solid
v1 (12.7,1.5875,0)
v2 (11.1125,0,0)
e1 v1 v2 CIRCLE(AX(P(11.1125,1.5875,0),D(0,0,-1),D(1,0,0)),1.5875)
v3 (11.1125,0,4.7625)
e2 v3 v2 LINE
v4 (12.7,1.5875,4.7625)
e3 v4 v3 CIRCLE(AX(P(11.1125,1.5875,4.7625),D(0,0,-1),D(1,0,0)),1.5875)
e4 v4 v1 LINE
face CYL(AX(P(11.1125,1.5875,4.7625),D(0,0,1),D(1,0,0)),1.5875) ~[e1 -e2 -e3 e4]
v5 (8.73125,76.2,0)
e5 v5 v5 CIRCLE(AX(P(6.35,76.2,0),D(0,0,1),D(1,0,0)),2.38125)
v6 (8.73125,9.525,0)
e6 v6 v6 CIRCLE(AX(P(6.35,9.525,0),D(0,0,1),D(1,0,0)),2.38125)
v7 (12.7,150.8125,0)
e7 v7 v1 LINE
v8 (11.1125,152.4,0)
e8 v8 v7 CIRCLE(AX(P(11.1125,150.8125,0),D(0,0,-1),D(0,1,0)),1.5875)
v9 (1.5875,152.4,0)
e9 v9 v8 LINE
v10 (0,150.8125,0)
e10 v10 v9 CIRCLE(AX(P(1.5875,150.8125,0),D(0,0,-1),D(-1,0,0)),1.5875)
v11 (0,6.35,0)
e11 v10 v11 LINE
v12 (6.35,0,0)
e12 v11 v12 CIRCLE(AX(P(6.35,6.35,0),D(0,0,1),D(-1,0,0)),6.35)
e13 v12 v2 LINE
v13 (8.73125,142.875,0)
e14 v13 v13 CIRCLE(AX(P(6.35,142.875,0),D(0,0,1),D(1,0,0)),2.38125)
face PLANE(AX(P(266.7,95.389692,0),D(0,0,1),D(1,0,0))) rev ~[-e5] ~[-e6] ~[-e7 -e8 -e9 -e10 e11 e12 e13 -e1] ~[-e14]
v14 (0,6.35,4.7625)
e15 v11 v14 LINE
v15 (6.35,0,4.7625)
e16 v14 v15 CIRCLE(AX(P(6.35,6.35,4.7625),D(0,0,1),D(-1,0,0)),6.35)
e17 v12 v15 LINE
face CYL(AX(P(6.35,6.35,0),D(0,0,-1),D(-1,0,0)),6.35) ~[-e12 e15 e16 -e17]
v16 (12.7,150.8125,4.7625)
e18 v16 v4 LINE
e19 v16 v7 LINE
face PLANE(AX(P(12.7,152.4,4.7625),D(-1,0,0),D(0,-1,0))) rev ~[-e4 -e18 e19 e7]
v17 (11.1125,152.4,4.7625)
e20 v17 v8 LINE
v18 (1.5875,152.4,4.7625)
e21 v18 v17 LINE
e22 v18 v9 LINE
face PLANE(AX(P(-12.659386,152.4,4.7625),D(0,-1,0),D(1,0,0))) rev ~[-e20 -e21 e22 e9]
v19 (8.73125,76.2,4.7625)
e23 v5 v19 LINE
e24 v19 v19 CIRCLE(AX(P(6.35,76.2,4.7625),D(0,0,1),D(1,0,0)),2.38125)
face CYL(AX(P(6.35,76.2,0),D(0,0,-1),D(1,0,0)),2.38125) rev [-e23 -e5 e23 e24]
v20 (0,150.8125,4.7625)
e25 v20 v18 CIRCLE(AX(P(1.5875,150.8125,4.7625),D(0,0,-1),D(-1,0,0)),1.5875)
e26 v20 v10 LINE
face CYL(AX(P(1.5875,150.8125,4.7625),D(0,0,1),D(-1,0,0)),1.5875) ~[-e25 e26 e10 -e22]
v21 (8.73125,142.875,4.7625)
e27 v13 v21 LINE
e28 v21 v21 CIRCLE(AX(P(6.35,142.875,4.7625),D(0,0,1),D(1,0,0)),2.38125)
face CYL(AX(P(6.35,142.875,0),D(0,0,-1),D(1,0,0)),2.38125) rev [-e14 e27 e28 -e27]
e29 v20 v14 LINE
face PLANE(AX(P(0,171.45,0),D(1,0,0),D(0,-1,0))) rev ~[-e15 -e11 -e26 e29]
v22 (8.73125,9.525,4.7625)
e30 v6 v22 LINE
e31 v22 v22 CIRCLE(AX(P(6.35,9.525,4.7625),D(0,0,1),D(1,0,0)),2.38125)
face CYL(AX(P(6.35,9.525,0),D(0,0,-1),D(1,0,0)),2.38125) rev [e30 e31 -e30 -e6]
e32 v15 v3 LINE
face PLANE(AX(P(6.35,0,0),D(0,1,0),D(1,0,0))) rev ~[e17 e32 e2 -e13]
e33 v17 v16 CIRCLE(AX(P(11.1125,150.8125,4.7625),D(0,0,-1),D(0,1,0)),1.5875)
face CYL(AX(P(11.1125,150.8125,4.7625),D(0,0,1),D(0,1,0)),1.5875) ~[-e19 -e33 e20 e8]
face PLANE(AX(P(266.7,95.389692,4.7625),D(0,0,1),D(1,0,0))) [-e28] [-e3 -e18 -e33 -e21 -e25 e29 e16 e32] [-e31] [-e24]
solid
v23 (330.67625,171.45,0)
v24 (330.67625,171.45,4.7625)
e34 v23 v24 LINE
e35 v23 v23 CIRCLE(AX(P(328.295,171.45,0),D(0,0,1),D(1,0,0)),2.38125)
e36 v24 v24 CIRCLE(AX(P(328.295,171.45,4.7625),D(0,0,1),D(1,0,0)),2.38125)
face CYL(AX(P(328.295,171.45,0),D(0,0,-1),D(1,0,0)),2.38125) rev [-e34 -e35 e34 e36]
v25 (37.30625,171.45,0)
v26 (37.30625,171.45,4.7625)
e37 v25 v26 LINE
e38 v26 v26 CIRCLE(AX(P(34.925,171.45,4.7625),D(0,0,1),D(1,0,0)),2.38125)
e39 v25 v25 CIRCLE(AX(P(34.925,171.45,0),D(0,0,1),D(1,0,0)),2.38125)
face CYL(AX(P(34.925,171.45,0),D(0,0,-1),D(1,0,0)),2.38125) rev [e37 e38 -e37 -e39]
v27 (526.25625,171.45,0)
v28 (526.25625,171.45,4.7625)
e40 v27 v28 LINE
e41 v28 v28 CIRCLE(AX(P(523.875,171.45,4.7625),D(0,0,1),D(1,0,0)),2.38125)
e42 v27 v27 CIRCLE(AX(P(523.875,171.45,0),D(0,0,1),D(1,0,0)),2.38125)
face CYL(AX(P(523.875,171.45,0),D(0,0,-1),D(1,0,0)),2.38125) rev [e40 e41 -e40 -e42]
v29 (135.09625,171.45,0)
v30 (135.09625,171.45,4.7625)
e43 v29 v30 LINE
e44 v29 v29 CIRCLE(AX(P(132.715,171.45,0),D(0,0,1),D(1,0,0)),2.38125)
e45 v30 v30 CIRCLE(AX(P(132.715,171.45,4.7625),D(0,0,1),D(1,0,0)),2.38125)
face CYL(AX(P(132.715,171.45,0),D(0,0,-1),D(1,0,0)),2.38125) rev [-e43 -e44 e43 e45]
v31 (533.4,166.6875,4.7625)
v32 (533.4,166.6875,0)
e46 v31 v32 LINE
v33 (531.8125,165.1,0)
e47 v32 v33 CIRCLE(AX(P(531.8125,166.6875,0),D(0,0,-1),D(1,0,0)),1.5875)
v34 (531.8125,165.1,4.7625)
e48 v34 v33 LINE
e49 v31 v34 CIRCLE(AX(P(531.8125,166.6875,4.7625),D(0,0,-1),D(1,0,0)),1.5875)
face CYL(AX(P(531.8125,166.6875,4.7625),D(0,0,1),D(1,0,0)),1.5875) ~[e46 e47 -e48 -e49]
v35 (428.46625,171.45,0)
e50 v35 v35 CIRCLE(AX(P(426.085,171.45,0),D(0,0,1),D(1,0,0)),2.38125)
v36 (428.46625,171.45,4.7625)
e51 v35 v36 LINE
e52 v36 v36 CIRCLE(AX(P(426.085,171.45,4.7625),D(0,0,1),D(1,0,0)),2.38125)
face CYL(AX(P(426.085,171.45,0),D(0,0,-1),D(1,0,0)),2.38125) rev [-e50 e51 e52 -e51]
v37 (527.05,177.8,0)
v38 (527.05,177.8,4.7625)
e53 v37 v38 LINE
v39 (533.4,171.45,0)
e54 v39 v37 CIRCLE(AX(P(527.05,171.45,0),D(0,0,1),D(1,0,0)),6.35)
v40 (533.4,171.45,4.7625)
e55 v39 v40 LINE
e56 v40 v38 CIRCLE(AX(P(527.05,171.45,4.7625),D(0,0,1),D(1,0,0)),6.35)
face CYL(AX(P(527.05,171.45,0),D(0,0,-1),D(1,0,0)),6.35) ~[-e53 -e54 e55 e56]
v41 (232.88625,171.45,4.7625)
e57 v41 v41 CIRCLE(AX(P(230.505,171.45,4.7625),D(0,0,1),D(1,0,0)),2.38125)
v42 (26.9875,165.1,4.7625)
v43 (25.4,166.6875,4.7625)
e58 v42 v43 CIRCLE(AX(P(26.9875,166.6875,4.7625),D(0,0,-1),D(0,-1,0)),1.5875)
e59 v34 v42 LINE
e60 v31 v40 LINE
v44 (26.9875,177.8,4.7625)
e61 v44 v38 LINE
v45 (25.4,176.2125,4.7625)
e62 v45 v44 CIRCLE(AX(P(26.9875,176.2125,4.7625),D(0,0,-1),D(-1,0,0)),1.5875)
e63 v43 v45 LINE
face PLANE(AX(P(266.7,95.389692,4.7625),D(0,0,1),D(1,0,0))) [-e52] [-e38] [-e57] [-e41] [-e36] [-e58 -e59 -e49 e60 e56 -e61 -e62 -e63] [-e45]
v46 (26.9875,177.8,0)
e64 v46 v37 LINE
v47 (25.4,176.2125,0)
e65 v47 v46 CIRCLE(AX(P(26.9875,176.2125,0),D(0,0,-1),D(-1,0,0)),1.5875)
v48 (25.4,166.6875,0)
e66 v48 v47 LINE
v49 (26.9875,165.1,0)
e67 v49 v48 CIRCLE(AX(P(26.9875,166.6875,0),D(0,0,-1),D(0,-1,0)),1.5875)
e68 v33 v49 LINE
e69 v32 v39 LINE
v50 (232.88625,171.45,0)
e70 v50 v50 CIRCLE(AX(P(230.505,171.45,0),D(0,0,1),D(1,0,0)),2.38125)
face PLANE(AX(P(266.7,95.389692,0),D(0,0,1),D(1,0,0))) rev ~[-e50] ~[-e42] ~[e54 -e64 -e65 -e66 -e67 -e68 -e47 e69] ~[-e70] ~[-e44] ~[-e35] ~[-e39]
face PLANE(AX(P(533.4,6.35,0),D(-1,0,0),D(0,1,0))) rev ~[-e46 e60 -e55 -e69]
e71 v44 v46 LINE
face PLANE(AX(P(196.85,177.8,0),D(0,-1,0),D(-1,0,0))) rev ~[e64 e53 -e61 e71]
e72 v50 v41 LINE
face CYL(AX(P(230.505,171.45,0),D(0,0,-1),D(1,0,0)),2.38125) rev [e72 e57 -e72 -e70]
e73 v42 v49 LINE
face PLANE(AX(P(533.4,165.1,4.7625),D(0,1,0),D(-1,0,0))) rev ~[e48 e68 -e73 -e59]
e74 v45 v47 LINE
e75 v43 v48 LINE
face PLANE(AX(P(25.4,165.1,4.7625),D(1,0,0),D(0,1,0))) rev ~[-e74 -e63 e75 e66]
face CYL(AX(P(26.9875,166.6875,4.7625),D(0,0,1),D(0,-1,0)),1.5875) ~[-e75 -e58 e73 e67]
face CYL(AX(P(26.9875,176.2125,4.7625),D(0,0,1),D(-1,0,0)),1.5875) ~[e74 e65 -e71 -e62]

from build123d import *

# Parameters (mm, degrees)
F0_R     = 2.38125
F1_DEPTH = 4.7625
F4_W     = 148.8558202982
F4_H     = 38.4750810385
F4_W_2   = 12.7
F4_H_2   = 12.7
F5_DEPTH = 4.7635
F7_DEPTH = 4.7625


# Not quite as in the source:
# - a feature of the source that left no trace in its solid (it failed there, or was rolled back) is left out


with BuildPart() as f1:
    # F0 (on Top) → F1 (new body)
    with BuildSketch(Plane.XY):
        with BuildLine():
            ThreePointArc((0, 6.35), (1.8598719395, 1.8598719395), (6.35, 0))
            Line((6.35, 0), (527.05, 0))
            ThreePointArc((527.05, 0), (531.5401280605, 1.8598719395), (533.4, 6.35))
            Line((533.4, 6.35), (533.4, 171.45))
            ThreePointArc((533.4, 171.45), (531.5401280605, 175.9401280605), (527.05, 177.8))
            Line((527.05, 177.8), (336.55, 177.8))
            ThreePointArc((336.55, 177.8), (332.0598719395, 179.6598719395), (330.2, 184.15))
            Line((330.2, 184.15), (330.2, 203.2))
            ThreePointArc((330.2, 203.2), (328.3401280605, 207.6901280605), (323.85, 209.55))
            Line((323.85, 209.55), (209.55, 209.55))
            ThreePointArc((209.55, 209.55), (205.0598719395, 207.6901280605), (203.2, 203.2))
            Line((203.2, 203.2), (203.2, 184.15))
            ThreePointArc((203.2, 184.15), (201.3401280605, 179.6598719395), (196.85, 177.8))
            Line((196.85, 177.8), (6.35, 177.8))
            ThreePointArc((6.35, 177.8), (1.8598719395, 175.9401280605), (0, 171.45))
            Line((0, 171.45), (0, 6.35))
        make_face()
        with Locations((6.35, 9.525)):
            Circle(F0_R, mode=Mode.SUBTRACT)
        with Locations((257.175, 30.1625)):
            Circle(F0_R, mode=Mode.SUBTRACT)
        with Locations((6.35, 76.2)):
            Circle(F0_R, mode=Mode.SUBTRACT)
        with Locations((257.175, 93.6625)):
            Circle(F0_R, mode=Mode.SUBTRACT)
        with Locations((485.775, 30.1625)):
            Circle(F0_R, mode=Mode.SUBTRACT)
        with Locations((485.775, 93.6625)):
            Circle(F0_R, mode=Mode.SUBTRACT)
        with Locations((6.35, 142.875)):
            Circle(F0_R, mode=Mode.SUBTRACT)
        with Locations((34.925, 171.45)):
            Circle(F0_R, mode=Mode.SUBTRACT)
        with Locations((132.715, 171.45)):
            Circle(F0_R, mode=Mode.SUBTRACT)
        with Locations((230.505, 171.45)):
            Circle(F0_R, mode=Mode.SUBTRACT)
        with Locations((223.8375, 195.2625)):
            Circle(F0_R, mode=Mode.SUBTRACT)
        with Locations((239.7125, 185.7375)):
            Circle(F0_R, mode=Mode.SUBTRACT)
        with Locations((328.295, 171.45)):
            Circle(F0_R, mode=Mode.SUBTRACT)
        with Locations((293.6875, 185.7375)):
            Circle(F0_R, mode=Mode.SUBTRACT)
        with Locations((309.5625, 195.2625)):
            Circle(F0_R, mode=Mode.SUBTRACT)
        with Locations((426.085, 171.45)):
            Circle(F0_R, mode=Mode.SUBTRACT)
        with Locations((523.875, 171.45)):
            Circle(F0_R, mode=Mode.SUBTRACT)
    extrude(amount=F1_DEPTH)

    # F4 (on face) → F5 (cut, through all)
    with BuildSketch(Plane.XY.offset(4.7625)):
        with Locations((269.9074968696, 197.0375405192)):
            Rectangle(F4_W, F4_H)
        Polygon((25.4, 185.5913083792), (-12.6593864247, 185.5913083792), (-12.6593864247, 152.4), (12.7, 152.4), (12.7, 165.1), (25.4, 165.1), align=None)
        Polygon((533.4, 165.1), (25.4, 165.1), (25.4, 152.4), (12.7, 152.4), (12.7, 0), (533.4, 0), align=None)
        with Locations((19.05, 158.75)):
            Rectangle(F4_W_2, F4_H_2)
    extrude(amount=-F5_DEPTH, mode=Mode.SUBTRACT)

    # F6 (on face) → F7 (cut, through all)
    with BuildSketch(Plane.XY.offset(4.7625)):
        with BuildLine():
            Line((12.7, 150.8125), (12.7, 152.4))
            Line((12.7, 152.4), (11.1125, 152.4))
            ThreePointArc((11.1125, 152.4), (12.2350320151, 151.9350320151), (12.7, 150.8125))
        make_face()
        with BuildLine():
            Line((1.5875, 152.4), (0, 152.4))
            Line((0, 152.4), (0, 150.8125))
            ThreePointArc((0, 150.8125), (0.4649679849, 151.9350320151), (1.5875, 152.4))
        make_face()
        with BuildLine():
            ThreePointArc((12.7, 1.5875), (12.2350320151, 0.4649679849), (11.1125, 0))
            Line((11.1125, 0), (12.7, 0))
            Line((12.7, 0), (12.7, 1.5875))
        make_face()
        with BuildLine():
            ThreePointArc((25.4, 176.2125), (25.8649679849, 177.3350320151), (26.9875, 177.8))
            Line((26.9875, 177.8), (25.4, 177.8))
            Line((25.4, 177.8), (25.4, 176.2125))
        make_face()
        with BuildLine():
            ThreePointArc((26.9875, 165.1), (25.8649679849, 165.5649679849), (25.4, 166.6875))
            Line((25.4, 166.6875), (25.4, 165.1))
            Line((25.4, 165.1), (26.9875, 165.1))
        make_face()
        with BuildLine():
            ThreePointArc((533.4, 166.6875), (532.9350320151, 165.5649679849), (531.8125, 165.1))
            Line((531.8125, 165.1), (533.4, 165.1))
            Line((533.4, 165.1), (533.4, 166.6875))
        make_face()
    extrude(amount=-F7_DEPTH, mode=Mode.SUBTRACT)


solid = f1.part
